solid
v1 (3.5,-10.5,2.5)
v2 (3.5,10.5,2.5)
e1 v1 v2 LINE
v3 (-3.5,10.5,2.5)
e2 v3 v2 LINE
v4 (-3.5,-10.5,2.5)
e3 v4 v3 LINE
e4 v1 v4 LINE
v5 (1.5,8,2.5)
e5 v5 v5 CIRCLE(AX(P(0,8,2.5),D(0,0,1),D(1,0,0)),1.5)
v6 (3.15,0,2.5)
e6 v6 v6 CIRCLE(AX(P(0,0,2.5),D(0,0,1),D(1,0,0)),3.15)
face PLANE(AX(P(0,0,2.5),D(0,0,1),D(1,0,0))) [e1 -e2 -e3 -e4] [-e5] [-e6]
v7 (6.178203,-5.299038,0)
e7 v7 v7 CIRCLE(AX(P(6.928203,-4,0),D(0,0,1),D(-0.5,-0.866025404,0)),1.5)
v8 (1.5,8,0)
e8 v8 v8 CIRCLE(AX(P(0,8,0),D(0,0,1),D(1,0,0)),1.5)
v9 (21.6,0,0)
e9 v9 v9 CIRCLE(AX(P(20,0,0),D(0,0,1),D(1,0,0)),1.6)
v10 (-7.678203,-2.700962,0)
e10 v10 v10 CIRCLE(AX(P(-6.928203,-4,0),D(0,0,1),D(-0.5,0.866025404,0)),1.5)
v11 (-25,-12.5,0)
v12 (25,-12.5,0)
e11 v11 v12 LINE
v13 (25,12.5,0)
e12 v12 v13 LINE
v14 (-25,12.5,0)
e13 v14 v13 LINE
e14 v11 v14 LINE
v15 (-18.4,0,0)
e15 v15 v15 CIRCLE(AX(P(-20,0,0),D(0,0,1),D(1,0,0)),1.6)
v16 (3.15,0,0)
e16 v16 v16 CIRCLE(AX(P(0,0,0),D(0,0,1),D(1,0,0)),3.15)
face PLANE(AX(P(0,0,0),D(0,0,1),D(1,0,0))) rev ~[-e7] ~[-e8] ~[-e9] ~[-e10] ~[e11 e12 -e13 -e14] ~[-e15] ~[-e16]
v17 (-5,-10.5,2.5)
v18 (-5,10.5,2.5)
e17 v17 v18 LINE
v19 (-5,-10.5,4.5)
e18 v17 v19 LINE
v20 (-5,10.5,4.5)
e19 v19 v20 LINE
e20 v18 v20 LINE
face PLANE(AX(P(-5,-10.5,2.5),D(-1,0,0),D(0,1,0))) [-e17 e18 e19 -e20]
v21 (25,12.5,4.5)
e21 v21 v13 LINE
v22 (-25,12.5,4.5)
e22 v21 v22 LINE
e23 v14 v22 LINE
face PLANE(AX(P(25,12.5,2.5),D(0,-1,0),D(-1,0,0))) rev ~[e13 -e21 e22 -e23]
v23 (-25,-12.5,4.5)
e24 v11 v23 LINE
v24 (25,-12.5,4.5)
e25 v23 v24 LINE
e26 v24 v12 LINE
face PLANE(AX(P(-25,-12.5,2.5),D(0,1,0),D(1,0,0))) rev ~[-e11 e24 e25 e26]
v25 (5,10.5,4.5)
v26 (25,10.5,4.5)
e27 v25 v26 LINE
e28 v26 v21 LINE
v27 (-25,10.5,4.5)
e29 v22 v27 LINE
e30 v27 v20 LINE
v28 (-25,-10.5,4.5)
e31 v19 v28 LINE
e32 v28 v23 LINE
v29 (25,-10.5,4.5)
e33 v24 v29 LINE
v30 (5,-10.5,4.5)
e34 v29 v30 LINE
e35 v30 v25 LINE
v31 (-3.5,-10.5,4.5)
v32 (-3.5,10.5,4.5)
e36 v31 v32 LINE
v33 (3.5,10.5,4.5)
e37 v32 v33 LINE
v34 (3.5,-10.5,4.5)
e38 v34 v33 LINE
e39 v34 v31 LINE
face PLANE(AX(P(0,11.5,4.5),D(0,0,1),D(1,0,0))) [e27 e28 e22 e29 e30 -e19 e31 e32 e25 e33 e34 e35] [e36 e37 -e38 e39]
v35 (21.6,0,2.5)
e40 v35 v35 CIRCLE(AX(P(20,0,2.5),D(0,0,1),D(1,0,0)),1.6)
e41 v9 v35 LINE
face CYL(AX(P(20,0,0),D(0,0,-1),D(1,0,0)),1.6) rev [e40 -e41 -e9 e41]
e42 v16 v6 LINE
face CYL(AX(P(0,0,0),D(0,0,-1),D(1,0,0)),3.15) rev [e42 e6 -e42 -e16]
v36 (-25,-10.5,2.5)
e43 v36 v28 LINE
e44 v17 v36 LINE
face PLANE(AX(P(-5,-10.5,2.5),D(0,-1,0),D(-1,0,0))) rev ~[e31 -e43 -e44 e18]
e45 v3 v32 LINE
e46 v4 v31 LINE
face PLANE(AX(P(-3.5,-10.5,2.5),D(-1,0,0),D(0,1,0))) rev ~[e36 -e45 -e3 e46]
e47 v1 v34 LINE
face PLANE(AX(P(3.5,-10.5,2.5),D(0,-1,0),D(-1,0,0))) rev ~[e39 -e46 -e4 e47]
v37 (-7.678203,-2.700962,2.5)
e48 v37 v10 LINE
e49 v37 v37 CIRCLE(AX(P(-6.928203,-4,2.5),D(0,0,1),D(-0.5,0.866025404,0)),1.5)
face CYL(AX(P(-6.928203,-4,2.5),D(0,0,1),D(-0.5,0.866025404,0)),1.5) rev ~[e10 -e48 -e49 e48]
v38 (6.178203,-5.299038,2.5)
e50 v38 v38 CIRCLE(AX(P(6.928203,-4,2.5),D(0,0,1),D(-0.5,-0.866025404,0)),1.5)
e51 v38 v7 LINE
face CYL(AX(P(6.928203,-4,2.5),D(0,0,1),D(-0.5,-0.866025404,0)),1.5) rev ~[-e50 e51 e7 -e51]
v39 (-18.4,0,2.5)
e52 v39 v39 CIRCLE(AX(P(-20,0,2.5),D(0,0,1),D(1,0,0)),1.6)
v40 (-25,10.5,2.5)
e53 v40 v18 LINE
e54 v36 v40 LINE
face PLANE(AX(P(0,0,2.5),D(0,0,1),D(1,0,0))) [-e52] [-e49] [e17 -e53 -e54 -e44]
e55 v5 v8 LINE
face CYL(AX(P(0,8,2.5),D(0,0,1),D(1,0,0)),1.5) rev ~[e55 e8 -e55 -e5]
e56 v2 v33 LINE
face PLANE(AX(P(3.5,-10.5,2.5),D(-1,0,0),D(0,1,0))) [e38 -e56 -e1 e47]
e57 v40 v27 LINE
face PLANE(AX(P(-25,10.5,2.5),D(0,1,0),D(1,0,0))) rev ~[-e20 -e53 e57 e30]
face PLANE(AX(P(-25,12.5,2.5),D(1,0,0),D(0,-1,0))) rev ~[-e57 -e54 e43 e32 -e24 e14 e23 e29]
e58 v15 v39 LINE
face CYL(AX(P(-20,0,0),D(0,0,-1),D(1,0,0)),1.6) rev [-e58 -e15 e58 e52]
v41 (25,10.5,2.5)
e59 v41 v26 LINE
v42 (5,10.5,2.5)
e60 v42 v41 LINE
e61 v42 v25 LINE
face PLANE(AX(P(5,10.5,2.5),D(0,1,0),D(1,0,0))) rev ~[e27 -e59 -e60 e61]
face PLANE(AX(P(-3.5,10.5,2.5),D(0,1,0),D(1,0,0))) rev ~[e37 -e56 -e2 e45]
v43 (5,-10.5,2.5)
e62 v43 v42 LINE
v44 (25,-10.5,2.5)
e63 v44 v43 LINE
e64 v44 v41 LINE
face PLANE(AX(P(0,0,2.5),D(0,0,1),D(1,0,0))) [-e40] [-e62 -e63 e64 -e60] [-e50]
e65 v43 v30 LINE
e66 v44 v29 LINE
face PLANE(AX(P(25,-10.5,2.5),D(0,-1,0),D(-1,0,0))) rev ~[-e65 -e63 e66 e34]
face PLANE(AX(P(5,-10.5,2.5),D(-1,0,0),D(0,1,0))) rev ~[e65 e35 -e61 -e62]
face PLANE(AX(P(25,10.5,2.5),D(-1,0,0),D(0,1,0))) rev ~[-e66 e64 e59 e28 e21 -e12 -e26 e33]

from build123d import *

# Parameters (mm, degrees)
F0_W            = 50
F0_H            = 25
F0_R            = 1.6
F0_R_2          = 3.15
F1_DEPTH        = 2.5
F2_R            = 1.5
F3_DEPTH        = 25
F3_COPIES_COUNT = 3
F4_W            = 1.5
F4_H            = 21
F5_DEPTH        = 2


# Not quite as in the source:
# - a pattern or mirror of a feature is missing from the dataset's text; its kind, count and spacing are read off the source's solid


with BuildPart() as f1:
    # F0 (on Top) → F1 (new body)
    with BuildSketch(Plane.XY):
        Rectangle(F0_W, F0_H)
        with Locations((-20, 0)):
            Circle(F0_R, mode=Mode.SUBTRACT)
        Circle(F0_R_2, mode=Mode.SUBTRACT)
        with Locations((20, 0)):
            Circle(F0_R, mode=Mode.SUBTRACT)
    extrude(amount=F1_DEPTH)

    # F2 (on face) → F3 (cut)
    with BuildSketch(Plane.XY.offset(2.5)):
        with Locations((0, 8)):
            Circle(F2_R)
    f3 = extrude(amount=-F3_DEPTH, mode=Mode.SUBTRACT)

    # F3_copies: F3 ×3 about axis
    f3_copies_axis = Axis((0, 0, 0), (0, 0, 1))
    for i in range(1, F3_COPIES_COUNT):
        add(f3.rotate(f3_copies_axis, i * 360 / F3_COPIES_COUNT), mode=Mode.SUBTRACT)

    # F4 (on face) → F5 (join)
    with BuildSketch(Plane.XY.offset(2.5)):
        Polygon((25, 12.5), (-25, 12.5), (-25, 10.5), (-5, 10.5), (-3.5, 10.5), (3.5, 10.5), (5, 10.5), (25, 10.5), align=None)
        with Locations((-4.25, 0)):
            Rectangle(F4_W, F4_H)
        with Locations((4.25, 0)):
            Rectangle(F4_W, F4_H)
        Polygon((-3.5, -10.5), (-5, -10.5), (-25, -10.5), (-25, -12.5), (25, -12.5), (25, -10.5), (5, -10.5), (3.5, -10.5), align=None)
    extrude(amount=F5_DEPTH)


solid = f1.part
